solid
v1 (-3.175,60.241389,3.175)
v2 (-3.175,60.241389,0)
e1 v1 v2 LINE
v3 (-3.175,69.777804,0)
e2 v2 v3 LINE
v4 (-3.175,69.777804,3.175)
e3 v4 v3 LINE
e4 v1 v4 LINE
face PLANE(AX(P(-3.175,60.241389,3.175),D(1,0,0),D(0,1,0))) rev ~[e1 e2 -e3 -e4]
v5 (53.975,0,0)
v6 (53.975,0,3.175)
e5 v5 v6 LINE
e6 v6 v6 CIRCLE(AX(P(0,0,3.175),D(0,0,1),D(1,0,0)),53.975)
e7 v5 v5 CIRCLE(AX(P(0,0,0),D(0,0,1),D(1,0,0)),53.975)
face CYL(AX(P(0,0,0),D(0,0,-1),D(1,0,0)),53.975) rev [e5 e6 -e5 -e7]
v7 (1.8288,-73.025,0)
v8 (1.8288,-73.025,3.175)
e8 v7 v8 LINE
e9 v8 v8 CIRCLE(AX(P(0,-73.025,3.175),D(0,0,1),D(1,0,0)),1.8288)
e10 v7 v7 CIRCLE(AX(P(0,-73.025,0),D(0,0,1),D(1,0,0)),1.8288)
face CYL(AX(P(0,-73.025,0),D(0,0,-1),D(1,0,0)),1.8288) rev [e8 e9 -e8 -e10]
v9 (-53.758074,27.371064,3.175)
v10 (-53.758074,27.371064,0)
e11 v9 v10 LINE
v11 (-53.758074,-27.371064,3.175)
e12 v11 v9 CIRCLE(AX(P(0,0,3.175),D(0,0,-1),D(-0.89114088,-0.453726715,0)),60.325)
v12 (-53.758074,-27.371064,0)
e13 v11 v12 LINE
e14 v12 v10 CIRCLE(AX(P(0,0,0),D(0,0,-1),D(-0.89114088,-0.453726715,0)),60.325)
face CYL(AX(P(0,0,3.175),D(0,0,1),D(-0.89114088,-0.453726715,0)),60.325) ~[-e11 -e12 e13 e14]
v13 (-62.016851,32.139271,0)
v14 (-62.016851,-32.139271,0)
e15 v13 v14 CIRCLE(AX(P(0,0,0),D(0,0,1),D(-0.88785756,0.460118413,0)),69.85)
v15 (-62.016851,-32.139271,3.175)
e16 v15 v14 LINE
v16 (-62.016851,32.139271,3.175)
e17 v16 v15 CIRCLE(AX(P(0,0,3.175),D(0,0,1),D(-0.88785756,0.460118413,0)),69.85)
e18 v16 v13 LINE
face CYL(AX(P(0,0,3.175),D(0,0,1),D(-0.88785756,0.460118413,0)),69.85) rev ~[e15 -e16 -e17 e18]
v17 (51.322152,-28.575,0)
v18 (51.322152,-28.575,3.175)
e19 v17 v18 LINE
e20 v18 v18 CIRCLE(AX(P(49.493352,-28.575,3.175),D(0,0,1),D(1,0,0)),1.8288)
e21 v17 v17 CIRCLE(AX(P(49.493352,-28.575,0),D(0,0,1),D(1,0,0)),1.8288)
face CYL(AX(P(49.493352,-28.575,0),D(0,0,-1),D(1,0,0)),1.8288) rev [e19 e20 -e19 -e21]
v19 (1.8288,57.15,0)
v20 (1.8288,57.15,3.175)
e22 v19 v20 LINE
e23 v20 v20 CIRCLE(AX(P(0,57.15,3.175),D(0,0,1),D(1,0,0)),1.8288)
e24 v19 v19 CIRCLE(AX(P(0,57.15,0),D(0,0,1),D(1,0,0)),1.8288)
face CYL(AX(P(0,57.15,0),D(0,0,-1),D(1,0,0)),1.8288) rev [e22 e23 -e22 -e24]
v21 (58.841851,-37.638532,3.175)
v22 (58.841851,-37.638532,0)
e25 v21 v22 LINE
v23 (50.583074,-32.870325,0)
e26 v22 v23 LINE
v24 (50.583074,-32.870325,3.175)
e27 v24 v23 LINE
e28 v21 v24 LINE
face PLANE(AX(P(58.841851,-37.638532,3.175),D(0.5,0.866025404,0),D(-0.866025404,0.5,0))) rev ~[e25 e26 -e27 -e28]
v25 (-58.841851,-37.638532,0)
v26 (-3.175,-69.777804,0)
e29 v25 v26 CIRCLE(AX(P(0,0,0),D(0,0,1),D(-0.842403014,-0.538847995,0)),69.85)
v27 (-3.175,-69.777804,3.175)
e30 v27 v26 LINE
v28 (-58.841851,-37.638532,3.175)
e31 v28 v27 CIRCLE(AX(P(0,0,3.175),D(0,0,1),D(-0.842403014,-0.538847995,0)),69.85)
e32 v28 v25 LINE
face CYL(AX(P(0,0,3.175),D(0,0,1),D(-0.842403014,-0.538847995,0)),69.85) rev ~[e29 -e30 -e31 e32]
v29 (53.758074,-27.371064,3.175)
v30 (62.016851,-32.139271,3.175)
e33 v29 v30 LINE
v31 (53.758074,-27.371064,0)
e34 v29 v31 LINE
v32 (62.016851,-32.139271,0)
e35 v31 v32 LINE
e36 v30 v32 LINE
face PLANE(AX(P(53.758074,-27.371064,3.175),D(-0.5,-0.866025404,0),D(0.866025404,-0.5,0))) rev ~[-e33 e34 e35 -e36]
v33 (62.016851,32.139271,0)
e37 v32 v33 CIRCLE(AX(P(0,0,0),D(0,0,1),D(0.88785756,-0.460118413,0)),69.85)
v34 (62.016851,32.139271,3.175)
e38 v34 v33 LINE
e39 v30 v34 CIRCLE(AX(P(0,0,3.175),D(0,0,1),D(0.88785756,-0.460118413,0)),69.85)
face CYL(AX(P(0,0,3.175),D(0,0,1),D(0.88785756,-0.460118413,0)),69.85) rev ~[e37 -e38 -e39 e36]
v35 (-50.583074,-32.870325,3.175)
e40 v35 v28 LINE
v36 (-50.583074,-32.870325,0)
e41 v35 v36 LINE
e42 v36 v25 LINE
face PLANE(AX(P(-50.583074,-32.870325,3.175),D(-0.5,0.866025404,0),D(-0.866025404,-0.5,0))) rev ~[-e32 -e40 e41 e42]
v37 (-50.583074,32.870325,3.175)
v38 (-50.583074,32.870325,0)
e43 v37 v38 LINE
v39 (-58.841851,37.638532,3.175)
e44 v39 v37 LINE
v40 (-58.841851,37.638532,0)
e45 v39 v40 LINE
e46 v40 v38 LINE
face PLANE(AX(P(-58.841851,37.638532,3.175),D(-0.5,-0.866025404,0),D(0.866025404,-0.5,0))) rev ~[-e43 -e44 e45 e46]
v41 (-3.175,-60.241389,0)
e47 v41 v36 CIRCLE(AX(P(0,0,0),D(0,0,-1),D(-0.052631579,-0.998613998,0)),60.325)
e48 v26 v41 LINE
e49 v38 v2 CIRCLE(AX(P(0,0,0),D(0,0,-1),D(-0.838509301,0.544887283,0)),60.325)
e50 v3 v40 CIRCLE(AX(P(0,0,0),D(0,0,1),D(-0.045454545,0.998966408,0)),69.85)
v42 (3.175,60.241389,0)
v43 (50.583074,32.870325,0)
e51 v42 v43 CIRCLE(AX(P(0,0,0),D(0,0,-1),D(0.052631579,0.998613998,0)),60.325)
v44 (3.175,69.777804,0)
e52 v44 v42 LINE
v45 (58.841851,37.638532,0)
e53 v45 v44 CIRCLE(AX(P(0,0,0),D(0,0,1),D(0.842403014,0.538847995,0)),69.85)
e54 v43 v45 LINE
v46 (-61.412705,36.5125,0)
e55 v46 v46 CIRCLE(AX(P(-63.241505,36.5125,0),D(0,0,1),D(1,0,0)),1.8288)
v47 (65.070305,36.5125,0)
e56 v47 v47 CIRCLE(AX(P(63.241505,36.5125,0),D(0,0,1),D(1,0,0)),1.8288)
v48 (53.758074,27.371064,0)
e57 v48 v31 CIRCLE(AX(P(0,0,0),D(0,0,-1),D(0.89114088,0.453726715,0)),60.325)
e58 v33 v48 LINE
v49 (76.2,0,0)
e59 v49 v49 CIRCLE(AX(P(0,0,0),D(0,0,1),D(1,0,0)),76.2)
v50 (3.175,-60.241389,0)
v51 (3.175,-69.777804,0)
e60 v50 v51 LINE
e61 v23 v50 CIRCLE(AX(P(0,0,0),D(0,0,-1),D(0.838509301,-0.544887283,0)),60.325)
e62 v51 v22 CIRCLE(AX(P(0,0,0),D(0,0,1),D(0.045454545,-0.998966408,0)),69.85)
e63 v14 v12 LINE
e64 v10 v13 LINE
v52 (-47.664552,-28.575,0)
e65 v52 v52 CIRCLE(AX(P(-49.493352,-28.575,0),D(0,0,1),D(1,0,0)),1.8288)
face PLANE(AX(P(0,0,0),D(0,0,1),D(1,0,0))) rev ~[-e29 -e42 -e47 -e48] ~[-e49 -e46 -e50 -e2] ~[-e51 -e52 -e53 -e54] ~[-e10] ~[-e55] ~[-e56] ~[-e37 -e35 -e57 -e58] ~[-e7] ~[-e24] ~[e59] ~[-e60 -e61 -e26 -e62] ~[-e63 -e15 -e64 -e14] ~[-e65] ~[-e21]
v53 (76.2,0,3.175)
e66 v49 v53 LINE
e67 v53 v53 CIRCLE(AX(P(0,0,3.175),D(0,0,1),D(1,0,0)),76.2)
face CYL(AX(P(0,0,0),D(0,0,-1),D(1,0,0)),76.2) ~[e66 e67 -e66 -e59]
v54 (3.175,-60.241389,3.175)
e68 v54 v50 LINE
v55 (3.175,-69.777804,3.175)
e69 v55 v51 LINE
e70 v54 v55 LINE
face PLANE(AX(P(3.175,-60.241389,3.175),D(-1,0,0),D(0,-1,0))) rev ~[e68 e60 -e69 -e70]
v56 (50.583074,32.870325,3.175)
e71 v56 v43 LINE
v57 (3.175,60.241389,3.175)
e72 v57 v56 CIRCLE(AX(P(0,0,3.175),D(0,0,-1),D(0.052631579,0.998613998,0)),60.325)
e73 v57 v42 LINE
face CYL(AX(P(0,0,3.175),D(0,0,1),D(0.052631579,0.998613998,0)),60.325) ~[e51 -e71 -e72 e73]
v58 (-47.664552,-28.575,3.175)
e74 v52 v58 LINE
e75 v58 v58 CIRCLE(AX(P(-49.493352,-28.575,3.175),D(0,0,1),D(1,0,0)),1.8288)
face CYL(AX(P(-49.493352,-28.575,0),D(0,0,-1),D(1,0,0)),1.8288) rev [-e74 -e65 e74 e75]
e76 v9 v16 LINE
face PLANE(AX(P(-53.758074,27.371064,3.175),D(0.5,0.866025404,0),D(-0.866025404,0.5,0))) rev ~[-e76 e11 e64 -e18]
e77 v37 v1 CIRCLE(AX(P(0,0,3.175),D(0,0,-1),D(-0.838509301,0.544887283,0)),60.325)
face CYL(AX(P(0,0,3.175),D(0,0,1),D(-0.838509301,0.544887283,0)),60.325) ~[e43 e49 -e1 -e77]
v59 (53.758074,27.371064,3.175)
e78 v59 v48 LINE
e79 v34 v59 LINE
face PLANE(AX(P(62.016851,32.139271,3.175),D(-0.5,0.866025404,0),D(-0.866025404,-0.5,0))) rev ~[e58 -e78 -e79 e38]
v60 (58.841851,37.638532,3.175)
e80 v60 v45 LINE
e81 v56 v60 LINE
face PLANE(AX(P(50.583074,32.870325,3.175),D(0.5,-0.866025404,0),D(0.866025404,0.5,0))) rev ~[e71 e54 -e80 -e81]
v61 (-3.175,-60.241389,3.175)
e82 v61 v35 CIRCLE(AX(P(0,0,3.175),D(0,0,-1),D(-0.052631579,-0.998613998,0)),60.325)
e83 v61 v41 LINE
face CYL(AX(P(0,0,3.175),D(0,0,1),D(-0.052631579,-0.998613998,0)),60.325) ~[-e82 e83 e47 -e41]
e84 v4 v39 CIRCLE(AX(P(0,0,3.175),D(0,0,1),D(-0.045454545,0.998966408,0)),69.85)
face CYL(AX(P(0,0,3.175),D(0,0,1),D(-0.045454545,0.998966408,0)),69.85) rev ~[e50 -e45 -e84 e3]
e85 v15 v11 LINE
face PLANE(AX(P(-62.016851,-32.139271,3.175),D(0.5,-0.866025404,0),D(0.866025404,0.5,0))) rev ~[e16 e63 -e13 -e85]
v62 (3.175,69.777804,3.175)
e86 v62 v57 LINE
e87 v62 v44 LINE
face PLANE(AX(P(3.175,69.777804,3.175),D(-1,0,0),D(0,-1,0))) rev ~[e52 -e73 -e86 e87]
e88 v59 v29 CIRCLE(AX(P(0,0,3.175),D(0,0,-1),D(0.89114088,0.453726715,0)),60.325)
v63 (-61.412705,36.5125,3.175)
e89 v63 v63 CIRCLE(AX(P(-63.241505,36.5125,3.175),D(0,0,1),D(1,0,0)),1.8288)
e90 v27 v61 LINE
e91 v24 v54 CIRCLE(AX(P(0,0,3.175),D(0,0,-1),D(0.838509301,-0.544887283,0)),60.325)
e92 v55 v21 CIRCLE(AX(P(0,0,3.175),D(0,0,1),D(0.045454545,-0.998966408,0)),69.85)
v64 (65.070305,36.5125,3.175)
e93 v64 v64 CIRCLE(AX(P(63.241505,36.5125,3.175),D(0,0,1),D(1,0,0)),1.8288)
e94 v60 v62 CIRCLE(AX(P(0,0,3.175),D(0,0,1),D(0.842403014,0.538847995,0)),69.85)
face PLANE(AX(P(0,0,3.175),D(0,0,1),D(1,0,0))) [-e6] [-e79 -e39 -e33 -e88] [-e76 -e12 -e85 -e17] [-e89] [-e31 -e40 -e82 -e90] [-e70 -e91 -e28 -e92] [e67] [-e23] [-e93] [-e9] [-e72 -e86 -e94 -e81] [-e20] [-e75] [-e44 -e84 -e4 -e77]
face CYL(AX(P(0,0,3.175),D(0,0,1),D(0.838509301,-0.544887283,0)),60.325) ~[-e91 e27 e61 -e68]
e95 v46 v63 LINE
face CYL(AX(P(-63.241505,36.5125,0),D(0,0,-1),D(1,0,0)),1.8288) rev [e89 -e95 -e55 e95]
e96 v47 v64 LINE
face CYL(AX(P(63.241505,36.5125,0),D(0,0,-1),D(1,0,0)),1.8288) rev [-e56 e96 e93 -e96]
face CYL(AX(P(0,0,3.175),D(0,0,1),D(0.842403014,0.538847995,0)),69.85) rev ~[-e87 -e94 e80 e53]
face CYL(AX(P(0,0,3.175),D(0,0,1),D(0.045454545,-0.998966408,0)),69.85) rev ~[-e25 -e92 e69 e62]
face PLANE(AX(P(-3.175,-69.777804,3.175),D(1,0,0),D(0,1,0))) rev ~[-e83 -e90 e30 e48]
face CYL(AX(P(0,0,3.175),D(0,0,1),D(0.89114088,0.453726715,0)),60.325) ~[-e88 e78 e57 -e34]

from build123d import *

# Parameters (mm, degrees)
F0_R            = 76.2
F0_R_2          = 1.8288
F0_R_3          = 53.975
F1_DEPTH        = 3.175
F3_DEPTH        = 3.175
F3_COPIES_COUNT = 6


# Not quite as in the source:
# - a pattern or mirror of a feature is missing from the dataset's text; its kind, count and spacing are read off the source's solid


with BuildPart() as f1:
    # F0 (on Top) → F1 (new body)
    with BuildSketch(Plane.XY):
        Circle(F0_R)
        with Locations((-49.4933518263, -28.575)):
            Circle(F0_R_2, mode=Mode.SUBTRACT)
        with Locations((0, -73.025)):
            Circle(F0_R_2, mode=Mode.SUBTRACT)
        with Locations((49.4933518263, -28.575)):
            Circle(F0_R_2, mode=Mode.SUBTRACT)
        with Locations((-63.2415051114, 36.5125)):
            Circle(F0_R_2, mode=Mode.SUBTRACT)
        Circle(F0_R_3, mode=Mode.SUBTRACT)
        with Locations((63.2415051114, 36.5125)):
            Circle(F0_R_2, mode=Mode.SUBTRACT)
        with Locations((0, 57.15)):
            Circle(F0_R_2, mode=Mode.SUBTRACT)
    extrude(amount=F1_DEPTH)

    # F2 (on face) → F3 (cut, through all)
    with BuildSketch(Plane.XY.offset(3.175)):
        with BuildLine():
            Line((-3.175, 60.2413894262), (-3.175, 69.7778035983))
            ThreePointArc((-3.175, 69.7778035983), (-34.925, 60.4918744543), (-58.8418505364, 37.6385324562))
            Line((-58.8418505364, 37.6385324562), (-50.5830736024, 32.8703253701))
            ThreePointArc((-50.5830736024, 32.8703253701), (-30.1625, 52.2429824833), (-3.175, 60.2413894262))
        make_face()
    f3 = extrude(amount=-F3_DEPTH, mode=Mode.SUBTRACT)

    # F3_copies: F3 ×6 about axis
    f3_copies_axis = Axis((0, 0, 0), (0, 0, 1))
    for i in range(1, F3_COPIES_COUNT):
        add(f3.rotate(f3_copies_axis, i * 360 / F3_COPIES_COUNT), mode=Mode.SUBTRACT)


solid = f1.part
